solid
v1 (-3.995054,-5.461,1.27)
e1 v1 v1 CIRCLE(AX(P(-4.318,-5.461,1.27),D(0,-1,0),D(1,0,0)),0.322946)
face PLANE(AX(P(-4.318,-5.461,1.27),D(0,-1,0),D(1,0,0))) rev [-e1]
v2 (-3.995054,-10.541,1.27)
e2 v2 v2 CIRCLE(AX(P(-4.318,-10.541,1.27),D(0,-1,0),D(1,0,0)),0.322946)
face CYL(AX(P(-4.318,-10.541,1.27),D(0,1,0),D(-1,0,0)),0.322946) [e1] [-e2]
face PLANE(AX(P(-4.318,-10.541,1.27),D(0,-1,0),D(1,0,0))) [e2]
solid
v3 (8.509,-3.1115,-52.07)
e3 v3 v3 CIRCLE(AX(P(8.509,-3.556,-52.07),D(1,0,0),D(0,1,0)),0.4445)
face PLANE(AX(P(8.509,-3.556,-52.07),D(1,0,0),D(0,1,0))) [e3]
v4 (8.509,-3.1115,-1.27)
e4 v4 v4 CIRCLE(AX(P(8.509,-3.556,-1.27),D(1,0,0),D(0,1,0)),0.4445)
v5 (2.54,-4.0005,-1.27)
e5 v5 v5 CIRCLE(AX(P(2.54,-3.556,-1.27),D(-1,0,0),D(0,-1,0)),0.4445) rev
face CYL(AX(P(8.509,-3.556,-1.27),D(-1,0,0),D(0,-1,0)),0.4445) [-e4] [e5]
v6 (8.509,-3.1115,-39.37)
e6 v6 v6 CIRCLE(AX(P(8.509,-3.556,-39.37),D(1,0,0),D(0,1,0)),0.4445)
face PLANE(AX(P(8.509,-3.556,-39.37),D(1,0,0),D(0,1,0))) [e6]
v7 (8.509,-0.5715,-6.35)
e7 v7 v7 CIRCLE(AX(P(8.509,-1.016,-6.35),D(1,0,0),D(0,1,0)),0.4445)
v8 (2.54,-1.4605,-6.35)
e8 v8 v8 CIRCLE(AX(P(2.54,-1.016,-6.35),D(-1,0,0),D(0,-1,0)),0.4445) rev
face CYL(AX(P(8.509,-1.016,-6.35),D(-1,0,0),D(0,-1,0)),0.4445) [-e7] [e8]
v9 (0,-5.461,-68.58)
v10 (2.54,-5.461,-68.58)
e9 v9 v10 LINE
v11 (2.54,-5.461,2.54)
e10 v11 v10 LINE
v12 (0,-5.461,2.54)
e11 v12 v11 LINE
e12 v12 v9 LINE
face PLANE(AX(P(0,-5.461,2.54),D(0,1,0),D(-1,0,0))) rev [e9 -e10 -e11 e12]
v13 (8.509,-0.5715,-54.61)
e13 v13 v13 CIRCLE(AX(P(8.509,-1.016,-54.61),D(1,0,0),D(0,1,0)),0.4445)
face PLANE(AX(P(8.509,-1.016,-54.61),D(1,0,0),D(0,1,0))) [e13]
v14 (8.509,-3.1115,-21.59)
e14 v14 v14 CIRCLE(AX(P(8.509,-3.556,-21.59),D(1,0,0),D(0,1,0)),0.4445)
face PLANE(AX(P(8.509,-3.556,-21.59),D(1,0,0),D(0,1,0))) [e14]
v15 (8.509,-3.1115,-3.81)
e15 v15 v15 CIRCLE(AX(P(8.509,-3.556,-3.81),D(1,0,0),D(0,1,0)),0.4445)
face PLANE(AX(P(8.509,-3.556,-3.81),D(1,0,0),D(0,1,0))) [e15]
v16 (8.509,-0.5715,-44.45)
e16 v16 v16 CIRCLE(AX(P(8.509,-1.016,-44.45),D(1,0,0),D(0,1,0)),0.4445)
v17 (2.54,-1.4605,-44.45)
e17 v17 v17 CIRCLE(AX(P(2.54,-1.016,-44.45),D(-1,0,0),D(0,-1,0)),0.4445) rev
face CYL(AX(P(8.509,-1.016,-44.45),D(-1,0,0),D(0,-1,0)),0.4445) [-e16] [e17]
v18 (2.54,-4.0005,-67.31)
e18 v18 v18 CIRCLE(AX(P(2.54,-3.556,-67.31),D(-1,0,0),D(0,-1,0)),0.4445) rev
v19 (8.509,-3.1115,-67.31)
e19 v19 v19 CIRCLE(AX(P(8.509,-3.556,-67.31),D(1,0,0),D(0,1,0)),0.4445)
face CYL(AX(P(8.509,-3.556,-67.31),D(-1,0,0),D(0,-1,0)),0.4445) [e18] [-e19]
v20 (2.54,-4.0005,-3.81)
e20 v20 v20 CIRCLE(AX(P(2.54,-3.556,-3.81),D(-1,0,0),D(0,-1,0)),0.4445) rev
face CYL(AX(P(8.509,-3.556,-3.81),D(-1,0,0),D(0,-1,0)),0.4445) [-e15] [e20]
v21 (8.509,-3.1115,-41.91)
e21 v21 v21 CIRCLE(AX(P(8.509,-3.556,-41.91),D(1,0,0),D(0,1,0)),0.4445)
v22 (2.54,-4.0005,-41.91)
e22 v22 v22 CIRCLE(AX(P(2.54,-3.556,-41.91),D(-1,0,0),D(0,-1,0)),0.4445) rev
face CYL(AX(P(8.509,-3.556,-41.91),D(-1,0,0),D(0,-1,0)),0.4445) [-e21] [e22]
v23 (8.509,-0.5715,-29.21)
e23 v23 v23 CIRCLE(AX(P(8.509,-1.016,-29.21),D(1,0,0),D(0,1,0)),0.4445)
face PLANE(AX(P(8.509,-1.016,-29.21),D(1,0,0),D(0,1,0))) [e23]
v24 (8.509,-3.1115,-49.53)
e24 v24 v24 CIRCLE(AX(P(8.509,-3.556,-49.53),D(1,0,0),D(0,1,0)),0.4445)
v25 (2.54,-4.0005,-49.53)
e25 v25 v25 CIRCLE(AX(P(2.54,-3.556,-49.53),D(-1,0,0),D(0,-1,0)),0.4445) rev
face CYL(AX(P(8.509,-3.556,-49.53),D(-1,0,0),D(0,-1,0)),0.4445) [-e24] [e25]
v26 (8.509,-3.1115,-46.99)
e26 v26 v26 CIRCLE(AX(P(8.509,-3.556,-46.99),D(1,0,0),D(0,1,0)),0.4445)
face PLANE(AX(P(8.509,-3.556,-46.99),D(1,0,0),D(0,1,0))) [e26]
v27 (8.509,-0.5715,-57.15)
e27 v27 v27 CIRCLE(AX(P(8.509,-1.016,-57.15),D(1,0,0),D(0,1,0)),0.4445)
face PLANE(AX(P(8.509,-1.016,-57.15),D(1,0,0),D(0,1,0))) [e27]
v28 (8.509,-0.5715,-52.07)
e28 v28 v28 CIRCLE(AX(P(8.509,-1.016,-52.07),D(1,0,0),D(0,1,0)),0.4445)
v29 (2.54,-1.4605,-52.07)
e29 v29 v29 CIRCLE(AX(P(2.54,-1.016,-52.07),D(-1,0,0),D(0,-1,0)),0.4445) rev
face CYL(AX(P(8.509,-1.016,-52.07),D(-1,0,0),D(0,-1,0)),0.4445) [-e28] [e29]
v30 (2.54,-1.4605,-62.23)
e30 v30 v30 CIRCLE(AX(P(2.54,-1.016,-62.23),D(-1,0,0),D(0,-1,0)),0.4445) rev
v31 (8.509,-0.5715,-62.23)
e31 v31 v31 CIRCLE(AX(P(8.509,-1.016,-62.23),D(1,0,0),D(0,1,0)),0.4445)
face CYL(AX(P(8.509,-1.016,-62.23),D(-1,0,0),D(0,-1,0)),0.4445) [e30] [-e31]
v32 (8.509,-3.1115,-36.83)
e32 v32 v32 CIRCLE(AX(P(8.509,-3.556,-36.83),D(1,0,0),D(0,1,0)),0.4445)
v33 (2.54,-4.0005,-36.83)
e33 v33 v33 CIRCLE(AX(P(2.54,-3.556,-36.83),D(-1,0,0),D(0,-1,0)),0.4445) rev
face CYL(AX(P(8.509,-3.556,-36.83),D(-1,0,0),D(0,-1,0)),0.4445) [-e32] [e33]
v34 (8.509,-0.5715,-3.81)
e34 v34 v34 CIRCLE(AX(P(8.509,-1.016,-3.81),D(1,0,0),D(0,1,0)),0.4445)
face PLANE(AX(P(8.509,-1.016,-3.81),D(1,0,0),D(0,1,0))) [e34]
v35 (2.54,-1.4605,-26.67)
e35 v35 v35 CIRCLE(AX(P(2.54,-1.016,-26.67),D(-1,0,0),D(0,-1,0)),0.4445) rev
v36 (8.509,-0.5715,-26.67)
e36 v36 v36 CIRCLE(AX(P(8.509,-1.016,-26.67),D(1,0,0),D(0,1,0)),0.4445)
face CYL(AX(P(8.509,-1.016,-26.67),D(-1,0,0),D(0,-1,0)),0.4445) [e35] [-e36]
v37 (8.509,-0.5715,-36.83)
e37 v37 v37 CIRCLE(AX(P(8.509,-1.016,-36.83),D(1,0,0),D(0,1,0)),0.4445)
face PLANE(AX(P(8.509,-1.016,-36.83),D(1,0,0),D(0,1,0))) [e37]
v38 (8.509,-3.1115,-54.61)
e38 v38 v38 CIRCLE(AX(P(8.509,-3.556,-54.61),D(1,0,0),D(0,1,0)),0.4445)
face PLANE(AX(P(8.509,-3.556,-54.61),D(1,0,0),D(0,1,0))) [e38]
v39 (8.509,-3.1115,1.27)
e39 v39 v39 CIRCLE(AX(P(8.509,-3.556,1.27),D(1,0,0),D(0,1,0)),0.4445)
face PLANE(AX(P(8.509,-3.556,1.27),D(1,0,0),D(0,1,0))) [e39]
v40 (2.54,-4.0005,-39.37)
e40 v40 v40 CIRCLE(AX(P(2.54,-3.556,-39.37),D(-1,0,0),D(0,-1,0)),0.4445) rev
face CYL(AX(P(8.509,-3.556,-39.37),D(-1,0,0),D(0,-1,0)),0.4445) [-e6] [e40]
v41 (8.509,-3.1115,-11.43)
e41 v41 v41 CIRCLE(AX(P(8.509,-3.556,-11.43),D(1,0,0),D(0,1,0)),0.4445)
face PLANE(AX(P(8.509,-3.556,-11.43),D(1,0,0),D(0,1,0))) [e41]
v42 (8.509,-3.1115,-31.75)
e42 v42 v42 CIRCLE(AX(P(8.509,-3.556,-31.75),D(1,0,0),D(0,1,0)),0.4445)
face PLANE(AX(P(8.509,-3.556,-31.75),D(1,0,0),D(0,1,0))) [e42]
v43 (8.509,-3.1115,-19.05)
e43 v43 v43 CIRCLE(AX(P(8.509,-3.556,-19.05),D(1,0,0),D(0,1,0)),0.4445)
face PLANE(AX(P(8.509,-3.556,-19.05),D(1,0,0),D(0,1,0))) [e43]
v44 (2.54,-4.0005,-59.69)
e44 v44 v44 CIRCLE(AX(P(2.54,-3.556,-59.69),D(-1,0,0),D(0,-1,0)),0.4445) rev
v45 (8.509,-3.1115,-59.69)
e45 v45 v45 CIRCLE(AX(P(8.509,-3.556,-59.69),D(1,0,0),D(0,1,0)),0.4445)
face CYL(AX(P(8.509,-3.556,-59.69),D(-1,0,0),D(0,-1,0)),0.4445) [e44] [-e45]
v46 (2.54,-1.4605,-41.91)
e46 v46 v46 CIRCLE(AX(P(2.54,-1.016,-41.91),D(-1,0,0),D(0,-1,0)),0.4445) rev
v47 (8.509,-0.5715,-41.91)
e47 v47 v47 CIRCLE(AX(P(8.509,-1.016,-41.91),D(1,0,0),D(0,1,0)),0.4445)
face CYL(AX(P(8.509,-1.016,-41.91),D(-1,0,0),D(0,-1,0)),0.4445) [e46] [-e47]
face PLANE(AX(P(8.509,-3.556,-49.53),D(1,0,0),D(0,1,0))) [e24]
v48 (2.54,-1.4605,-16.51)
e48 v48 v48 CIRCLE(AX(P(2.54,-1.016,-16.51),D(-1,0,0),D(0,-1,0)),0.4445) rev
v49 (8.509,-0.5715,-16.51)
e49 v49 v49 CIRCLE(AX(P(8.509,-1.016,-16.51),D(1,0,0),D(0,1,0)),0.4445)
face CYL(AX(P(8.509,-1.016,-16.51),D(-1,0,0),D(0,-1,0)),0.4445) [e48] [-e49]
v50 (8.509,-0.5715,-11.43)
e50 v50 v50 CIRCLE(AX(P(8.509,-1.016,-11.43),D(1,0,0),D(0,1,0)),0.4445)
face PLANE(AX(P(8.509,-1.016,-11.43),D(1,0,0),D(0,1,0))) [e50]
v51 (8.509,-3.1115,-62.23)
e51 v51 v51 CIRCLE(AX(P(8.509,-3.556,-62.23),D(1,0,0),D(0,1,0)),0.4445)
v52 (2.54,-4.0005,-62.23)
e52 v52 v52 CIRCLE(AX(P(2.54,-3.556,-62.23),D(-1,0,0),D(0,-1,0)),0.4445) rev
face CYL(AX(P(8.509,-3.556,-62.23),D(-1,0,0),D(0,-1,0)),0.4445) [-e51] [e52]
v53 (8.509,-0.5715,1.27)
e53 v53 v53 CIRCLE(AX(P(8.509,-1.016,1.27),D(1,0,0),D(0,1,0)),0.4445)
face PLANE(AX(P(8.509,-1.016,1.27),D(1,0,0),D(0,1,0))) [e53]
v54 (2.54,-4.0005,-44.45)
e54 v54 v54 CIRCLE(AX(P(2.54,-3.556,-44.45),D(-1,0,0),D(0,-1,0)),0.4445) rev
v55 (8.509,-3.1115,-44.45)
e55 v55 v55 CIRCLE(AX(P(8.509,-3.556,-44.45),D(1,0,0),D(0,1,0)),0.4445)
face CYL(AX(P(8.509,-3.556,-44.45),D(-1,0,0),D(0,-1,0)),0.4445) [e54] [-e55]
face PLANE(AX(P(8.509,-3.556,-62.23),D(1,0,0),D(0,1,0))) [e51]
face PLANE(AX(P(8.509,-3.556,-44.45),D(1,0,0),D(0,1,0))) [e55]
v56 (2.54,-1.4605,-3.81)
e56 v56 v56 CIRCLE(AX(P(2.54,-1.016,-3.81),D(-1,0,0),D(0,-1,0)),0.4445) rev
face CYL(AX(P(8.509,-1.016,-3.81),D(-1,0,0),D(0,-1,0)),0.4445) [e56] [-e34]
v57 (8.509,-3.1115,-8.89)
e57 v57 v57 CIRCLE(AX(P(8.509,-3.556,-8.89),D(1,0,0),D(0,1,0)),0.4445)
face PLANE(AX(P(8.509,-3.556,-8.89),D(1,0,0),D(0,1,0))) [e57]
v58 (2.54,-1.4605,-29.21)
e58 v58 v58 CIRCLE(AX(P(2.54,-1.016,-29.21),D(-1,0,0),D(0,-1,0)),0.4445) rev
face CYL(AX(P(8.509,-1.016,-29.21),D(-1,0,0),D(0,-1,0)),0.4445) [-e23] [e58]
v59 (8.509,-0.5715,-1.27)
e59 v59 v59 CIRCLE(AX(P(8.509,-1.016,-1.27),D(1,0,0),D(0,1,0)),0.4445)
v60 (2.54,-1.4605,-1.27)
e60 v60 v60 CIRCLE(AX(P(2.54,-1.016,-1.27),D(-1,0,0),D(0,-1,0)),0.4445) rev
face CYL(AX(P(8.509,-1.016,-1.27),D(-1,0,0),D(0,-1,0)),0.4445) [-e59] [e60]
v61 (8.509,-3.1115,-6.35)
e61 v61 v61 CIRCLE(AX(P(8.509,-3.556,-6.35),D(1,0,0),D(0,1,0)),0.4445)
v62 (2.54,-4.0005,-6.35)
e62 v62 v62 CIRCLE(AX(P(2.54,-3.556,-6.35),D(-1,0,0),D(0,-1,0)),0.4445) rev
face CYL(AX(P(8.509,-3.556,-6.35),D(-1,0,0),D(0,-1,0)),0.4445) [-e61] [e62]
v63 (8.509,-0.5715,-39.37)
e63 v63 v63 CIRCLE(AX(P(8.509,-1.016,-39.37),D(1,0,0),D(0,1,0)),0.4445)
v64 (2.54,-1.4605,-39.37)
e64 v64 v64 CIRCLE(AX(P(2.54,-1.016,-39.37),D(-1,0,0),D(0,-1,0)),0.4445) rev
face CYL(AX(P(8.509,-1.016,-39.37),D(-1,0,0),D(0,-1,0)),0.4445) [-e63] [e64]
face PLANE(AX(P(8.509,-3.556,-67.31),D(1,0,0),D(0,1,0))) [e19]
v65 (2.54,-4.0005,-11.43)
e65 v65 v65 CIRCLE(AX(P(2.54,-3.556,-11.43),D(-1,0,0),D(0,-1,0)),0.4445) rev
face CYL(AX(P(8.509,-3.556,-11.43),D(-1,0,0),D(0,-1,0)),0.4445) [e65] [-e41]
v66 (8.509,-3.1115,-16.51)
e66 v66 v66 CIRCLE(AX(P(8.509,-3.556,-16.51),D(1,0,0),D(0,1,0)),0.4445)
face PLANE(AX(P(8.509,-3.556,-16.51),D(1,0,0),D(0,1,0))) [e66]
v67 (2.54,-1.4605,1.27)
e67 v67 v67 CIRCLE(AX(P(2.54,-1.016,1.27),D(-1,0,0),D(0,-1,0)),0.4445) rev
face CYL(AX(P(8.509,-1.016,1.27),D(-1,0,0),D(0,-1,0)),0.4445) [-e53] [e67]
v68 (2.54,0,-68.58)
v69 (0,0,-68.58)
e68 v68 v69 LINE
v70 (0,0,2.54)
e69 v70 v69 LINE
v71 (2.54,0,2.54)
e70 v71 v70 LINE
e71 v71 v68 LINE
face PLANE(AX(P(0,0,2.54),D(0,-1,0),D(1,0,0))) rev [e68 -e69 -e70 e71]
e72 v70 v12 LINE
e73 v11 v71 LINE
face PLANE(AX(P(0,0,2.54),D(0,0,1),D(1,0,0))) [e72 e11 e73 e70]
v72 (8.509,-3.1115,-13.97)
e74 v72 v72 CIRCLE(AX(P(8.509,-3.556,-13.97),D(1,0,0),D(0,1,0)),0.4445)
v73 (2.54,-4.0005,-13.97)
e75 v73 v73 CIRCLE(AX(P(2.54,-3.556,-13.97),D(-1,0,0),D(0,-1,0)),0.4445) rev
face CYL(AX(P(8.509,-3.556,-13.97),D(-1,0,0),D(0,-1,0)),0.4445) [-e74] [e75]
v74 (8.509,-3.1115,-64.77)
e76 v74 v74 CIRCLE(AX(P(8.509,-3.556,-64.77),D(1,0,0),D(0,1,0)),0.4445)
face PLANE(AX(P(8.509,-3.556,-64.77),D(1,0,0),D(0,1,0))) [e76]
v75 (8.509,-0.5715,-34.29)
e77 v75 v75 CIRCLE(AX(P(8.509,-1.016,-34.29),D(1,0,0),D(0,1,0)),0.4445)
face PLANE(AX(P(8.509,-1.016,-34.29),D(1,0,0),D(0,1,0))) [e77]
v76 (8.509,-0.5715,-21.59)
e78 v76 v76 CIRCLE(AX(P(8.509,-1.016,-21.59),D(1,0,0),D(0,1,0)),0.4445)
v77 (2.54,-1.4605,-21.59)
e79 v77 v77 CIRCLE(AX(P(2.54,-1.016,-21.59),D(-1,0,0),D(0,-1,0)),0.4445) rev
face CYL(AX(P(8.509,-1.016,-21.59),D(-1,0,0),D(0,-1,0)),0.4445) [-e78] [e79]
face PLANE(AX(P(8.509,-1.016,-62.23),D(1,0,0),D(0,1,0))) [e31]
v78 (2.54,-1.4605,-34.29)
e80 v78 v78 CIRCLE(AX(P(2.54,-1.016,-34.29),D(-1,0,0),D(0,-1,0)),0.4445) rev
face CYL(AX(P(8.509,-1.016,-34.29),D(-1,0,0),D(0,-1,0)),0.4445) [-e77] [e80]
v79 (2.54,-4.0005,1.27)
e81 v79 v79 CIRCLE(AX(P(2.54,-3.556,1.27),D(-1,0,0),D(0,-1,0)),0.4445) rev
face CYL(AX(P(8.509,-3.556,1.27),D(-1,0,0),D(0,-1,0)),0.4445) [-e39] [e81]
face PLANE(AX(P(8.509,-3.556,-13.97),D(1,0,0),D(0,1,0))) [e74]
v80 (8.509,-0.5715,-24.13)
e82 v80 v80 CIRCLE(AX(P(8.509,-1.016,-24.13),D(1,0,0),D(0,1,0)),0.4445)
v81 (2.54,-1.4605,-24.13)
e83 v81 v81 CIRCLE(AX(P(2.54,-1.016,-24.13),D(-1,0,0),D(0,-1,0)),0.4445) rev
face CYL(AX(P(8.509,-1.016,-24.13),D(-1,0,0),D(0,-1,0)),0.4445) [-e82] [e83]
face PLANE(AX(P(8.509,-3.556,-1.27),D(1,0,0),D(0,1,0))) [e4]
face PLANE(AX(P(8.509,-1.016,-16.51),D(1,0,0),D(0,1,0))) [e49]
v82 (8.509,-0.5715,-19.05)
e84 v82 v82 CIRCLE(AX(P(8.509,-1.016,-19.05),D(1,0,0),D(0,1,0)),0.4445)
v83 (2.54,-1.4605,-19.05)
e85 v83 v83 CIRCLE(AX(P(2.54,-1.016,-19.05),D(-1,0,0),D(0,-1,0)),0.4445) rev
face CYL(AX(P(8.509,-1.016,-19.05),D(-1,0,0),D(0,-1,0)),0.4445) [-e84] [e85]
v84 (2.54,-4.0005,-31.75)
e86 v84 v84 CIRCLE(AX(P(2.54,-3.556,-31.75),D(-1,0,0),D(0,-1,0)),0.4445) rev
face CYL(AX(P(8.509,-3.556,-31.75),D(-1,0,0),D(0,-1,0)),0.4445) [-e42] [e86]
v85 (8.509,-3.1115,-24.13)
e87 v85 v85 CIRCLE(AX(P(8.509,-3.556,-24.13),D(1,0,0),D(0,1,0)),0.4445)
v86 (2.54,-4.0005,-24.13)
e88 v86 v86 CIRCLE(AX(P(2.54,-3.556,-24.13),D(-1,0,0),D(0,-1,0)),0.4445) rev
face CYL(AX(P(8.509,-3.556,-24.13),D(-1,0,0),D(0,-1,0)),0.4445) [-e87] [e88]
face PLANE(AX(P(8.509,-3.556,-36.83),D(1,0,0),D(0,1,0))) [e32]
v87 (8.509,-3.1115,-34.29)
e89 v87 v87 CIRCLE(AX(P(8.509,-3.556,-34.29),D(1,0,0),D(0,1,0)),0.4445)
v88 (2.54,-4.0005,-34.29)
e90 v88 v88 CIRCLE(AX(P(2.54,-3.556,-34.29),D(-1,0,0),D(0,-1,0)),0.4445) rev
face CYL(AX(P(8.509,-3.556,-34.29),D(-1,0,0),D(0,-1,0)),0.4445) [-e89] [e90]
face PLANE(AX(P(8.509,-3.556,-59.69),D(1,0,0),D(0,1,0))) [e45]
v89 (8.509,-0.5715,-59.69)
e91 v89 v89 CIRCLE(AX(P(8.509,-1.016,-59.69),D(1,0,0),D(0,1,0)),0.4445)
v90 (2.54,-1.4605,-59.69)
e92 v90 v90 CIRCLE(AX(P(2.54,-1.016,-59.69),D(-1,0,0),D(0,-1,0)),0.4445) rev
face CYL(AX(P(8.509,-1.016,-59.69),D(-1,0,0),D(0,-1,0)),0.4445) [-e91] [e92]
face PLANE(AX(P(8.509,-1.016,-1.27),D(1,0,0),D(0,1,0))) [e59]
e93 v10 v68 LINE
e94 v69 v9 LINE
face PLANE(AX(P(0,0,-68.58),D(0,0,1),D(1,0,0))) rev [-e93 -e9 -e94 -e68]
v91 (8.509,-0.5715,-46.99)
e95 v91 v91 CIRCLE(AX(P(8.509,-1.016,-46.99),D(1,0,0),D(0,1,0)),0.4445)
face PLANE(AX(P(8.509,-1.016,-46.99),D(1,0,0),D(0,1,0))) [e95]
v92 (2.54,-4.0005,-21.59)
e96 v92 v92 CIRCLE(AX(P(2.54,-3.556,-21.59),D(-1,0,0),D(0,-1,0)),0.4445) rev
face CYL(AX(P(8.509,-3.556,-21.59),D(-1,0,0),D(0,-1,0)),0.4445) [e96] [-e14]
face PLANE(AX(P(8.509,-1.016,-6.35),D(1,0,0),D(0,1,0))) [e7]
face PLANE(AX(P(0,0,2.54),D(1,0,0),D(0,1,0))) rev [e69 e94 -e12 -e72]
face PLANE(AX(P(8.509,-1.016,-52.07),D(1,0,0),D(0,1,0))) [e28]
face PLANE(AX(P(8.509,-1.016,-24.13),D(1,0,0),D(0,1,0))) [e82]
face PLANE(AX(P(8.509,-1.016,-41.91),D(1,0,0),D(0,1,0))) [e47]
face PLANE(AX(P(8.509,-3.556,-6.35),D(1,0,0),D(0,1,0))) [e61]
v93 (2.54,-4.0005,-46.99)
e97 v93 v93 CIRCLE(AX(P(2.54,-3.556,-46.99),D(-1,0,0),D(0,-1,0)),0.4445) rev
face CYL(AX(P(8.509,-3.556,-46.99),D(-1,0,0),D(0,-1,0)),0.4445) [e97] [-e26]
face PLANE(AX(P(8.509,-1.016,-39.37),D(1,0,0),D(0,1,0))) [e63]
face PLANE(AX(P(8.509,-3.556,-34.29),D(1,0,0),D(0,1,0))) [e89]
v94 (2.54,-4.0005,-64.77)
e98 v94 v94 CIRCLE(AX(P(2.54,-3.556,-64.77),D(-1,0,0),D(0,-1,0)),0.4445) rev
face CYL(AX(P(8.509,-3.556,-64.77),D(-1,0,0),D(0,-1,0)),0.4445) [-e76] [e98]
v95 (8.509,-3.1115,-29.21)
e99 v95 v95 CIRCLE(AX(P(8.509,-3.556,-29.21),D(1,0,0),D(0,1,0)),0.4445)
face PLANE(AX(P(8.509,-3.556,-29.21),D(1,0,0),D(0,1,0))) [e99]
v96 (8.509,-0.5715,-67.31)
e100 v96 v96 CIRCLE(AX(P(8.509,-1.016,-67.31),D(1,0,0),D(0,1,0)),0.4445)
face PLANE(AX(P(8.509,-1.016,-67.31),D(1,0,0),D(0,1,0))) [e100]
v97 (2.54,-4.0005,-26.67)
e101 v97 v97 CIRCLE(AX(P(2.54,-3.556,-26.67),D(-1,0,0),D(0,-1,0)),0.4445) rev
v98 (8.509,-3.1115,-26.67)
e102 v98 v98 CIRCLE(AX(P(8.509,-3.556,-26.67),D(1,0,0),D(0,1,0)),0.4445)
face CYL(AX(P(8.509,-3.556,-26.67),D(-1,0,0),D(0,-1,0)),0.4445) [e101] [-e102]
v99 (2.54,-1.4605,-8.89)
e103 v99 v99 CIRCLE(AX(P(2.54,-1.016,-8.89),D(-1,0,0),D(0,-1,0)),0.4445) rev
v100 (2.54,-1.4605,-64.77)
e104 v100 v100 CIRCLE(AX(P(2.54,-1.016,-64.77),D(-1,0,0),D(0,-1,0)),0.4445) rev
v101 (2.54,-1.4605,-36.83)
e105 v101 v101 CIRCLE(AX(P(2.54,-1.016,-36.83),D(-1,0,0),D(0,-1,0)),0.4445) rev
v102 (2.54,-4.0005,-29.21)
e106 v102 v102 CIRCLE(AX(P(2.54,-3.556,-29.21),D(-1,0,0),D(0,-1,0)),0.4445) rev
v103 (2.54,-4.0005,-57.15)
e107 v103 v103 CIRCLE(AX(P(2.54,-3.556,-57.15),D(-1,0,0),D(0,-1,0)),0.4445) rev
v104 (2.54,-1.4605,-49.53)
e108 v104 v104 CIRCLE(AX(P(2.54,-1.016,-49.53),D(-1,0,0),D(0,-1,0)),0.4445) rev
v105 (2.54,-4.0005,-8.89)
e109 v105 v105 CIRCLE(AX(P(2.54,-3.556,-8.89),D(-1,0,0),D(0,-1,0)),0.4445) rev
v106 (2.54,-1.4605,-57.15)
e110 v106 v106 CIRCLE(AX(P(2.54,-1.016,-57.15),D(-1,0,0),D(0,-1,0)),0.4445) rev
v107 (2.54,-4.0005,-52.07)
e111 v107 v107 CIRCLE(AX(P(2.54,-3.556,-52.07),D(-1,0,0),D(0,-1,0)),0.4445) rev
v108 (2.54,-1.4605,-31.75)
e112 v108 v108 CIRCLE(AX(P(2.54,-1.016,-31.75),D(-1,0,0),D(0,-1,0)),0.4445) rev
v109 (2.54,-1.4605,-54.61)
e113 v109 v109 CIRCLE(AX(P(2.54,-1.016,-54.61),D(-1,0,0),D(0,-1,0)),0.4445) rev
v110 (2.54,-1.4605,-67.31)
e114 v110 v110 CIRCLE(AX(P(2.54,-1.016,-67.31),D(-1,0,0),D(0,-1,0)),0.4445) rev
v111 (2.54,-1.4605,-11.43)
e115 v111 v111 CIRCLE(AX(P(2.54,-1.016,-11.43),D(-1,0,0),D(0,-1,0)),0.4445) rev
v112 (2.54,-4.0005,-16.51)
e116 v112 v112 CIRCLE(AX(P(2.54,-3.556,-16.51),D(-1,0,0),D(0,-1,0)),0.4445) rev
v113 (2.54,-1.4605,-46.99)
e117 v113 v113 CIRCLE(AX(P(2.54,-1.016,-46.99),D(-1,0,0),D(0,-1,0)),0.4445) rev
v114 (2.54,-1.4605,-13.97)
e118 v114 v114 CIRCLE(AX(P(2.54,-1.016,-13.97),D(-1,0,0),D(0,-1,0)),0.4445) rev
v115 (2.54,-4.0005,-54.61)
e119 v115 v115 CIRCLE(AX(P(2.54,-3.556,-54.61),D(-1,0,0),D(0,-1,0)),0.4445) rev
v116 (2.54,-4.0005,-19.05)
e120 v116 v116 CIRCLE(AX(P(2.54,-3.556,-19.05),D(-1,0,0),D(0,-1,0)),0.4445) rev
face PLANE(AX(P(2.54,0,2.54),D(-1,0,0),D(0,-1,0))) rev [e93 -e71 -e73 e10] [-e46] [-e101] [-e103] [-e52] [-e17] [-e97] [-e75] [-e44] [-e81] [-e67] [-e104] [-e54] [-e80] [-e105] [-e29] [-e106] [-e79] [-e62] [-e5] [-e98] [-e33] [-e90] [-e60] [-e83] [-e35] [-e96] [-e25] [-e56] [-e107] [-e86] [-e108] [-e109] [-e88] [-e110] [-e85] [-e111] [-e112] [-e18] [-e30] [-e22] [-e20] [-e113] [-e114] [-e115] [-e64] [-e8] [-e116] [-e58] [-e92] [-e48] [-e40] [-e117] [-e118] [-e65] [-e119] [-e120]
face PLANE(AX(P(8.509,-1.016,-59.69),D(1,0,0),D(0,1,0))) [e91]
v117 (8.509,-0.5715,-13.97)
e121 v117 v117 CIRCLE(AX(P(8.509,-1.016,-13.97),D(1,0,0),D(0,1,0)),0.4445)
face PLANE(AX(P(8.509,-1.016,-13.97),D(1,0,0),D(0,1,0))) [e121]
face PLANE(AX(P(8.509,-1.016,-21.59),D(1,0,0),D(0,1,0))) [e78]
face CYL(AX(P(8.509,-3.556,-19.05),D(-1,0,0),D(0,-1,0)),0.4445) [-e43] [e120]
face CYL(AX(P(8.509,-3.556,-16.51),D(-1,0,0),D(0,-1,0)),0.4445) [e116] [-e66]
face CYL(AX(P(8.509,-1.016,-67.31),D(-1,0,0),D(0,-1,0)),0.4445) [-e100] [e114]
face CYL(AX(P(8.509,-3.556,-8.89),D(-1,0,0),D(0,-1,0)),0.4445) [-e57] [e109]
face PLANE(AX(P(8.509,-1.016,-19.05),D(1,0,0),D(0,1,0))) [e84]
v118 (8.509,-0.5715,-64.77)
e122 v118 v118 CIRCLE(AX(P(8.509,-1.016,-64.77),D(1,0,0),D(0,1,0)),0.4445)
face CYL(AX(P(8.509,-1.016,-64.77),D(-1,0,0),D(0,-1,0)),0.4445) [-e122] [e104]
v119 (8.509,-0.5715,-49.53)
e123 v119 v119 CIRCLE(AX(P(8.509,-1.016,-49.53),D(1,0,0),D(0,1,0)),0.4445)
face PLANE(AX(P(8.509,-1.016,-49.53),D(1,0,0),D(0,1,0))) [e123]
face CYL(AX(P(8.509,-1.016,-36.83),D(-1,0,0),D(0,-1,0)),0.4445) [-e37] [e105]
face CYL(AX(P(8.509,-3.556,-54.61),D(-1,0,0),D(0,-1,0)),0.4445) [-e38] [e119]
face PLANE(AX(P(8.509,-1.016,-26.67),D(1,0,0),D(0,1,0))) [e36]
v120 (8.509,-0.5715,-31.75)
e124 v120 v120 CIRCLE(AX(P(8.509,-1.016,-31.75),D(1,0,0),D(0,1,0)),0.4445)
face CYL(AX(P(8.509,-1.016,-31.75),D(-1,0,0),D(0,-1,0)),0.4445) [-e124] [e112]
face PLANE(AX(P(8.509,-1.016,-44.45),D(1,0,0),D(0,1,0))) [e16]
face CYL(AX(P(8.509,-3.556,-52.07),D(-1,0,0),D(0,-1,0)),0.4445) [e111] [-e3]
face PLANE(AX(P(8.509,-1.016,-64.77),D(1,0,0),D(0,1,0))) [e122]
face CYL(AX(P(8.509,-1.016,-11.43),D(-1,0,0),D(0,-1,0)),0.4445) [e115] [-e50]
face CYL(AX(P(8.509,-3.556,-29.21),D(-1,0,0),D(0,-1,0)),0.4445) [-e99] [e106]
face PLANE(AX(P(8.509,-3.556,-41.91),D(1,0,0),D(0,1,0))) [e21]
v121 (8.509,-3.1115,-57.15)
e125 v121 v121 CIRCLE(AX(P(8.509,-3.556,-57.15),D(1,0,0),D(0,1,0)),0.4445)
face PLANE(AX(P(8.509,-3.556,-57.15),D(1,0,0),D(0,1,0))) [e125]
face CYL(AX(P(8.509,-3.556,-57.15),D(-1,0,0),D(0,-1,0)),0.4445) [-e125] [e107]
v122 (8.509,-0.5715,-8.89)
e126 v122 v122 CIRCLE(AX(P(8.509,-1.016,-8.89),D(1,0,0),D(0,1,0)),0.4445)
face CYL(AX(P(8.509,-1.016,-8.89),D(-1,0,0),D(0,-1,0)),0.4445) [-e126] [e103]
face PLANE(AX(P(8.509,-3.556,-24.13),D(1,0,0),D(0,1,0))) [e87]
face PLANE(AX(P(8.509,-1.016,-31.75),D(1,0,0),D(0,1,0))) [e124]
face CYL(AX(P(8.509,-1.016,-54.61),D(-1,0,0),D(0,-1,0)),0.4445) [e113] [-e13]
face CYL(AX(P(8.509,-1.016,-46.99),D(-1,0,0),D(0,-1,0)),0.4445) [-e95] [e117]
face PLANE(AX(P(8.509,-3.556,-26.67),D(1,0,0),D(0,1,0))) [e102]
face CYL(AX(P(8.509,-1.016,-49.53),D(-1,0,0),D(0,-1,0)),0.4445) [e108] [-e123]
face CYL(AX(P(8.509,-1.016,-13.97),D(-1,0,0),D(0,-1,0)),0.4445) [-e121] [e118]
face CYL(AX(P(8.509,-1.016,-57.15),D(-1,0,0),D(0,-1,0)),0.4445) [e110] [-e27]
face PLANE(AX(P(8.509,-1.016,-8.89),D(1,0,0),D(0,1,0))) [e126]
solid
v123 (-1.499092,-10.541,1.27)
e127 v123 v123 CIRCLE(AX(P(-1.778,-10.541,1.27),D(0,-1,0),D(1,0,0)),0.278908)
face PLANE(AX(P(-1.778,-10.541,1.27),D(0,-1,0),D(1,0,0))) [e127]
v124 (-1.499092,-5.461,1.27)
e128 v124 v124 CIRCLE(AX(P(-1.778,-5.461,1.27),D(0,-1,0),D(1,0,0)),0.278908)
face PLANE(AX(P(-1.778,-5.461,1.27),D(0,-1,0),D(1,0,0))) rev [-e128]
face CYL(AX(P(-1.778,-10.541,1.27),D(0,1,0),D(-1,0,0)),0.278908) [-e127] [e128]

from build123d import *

# Parameters (mm, degrees)
SKETCH1_W             = 2.54
SKETCH1_H             = 5.461
EXTRUDE1_DEPTH        = 2.54
SKETCH2_R             = 0.4445
EXTRUDE2_DEPTH        = 5.969
SKETCH3_R             = 0.27890811
EXTRUDE3_DEPTH        = 5.08
SKETCH3_R_2           = 0.322946233
EXTRUDE3_2_DEPTH      = 5.08
LPATTERN1_OUTLINE_W   = 5.461
LPATTERN1_OUTLINE_H   = 68.58
LPATTERN1_DEPTH       = 2.54
LPATTERN1_START       = 2.54
LPATTERN1_2_OUTLINE_R = 0.4445
LPATTERN1_2_DEPTH     = 5.969


# Read off the part's stored shape, not the designer's step: LPattern1
with BuildPart() as part:
    # Sketch1 → Extrude1 (new body)
    with BuildSketch(Plane.XY):
        with Locations((1.27, -2.7305)):
            Rectangle(SKETCH1_W, SKETCH1_H)
    extrude(amount=EXTRUDE1_DEPTH)

    # Sketch2 → Extrude2 (add)
    with BuildSketch(Plane(origin=(2.54, 0, 0), x_dir=(0, 0, -1), z_dir=(1, 0, 0))):
        with Locations(Location((-1.27, -3.556, 0), (0, 0, 270))):
            Circle(SKETCH2_R)
        with Locations(Location((-1.27, -1.016, 0), (0, 0, 270))):
            Circle(SKETCH2_R)
    extrude(amount=EXTRUDE2_DEPTH)

    # LPattern1 outline → LPattern1 (add)
    with BuildSketch(Plane.YZ):
        with Locations((-2.7305, -34.29)):
            Rectangle(LPATTERN1_OUTLINE_W, LPATTERN1_OUTLINE_H)
    extrude(amount=LPATTERN1_DEPTH)

    # LPattern1 2 outline → LPattern1 2 (add)
    with BuildSketch(Plane.YZ.offset(LPATTERN1_START)):
        with Locations((-3.556, -1.27)):
            Circle(LPATTERN1_2_OUTLINE_R)
        with Locations((-1.016, -1.27)):
            Circle(LPATTERN1_2_OUTLINE_R)
        with Locations((-3.556, -3.81)):
            Circle(LPATTERN1_2_OUTLINE_R)
        with Locations((-1.016, -3.81)):
            Circle(LPATTERN1_2_OUTLINE_R)
        with Locations((-3.556, -6.35)):
            Circle(LPATTERN1_2_OUTLINE_R)
        with Locations((-1.016, -6.35)):
            Circle(LPATTERN1_2_OUTLINE_R)
        with Locations((-3.556, -8.89)):
            Circle(LPATTERN1_2_OUTLINE_R)
        with Locations((-1.016, -8.89)):
            Circle(LPATTERN1_2_OUTLINE_R)
        with Locations((-3.556, -11.43)):
            Circle(LPATTERN1_2_OUTLINE_R)
        with Locations((-1.016, -11.43)):
            Circle(LPATTERN1_2_OUTLINE_R)
        with Locations((-3.556, -13.97)):
            Circle(LPATTERN1_2_OUTLINE_R)
        with Locations((-1.016, -13.97)):
            Circle(LPATTERN1_2_OUTLINE_R)
        with Locations((-3.556, -16.51)):
            Circle(LPATTERN1_2_OUTLINE_R)
        with Locations((-1.016, -16.51)):
            Circle(LPATTERN1_2_OUTLINE_R)
        with Locations((-3.556, -19.05)):
            Circle(LPATTERN1_2_OUTLINE_R)
        with Locations((-1.016, -19.05)):
            Circle(LPATTERN1_2_OUTLINE_R)
        with Locations((-3.556, -21.59)):
            Circle(LPATTERN1_2_OUTLINE_R)
        with Locations((-1.016, -21.59)):
            Circle(LPATTERN1_2_OUTLINE_R)
        with Locations((-3.556, -24.13)):
            Circle(LPATTERN1_2_OUTLINE_R)
        with Locations((-1.016, -24.13)):
            Circle(LPATTERN1_2_OUTLINE_R)
        with Locations((-3.556, -26.67)):
            Circle(LPATTERN1_2_OUTLINE_R)
        with Locations((-1.016, -26.67)):
            Circle(LPATTERN1_2_OUTLINE_R)
        with Locations((-3.556, -29.21)):
            Circle(LPATTERN1_2_OUTLINE_R)
        with Locations((-1.016, -29.21)):
            Circle(LPATTERN1_2_OUTLINE_R)
        with Locations((-3.556, -31.75)):
            Circle(LPATTERN1_2_OUTLINE_R)
        with Locations((-1.016, -31.75)):
            Circle(LPATTERN1_2_OUTLINE_R)
        with Locations((-3.556, -34.29)):
            Circle(LPATTERN1_2_OUTLINE_R)
        with Locations((-1.016, -34.29)):
            Circle(LPATTERN1_2_OUTLINE_R)
        with Locations((-3.556, -36.83)):
            Circle(LPATTERN1_2_OUTLINE_R)
        with Locations((-1.016, -36.83)):
            Circle(LPATTERN1_2_OUTLINE_R)
        with Locations((-3.556, -39.37)):
            Circle(LPATTERN1_2_OUTLINE_R)
        with Locations((-1.016, -39.37)):
            Circle(LPATTERN1_2_OUTLINE_R)
        with Locations((-3.556, -41.91)):
            Circle(LPATTERN1_2_OUTLINE_R)
        with Locations((-1.016, -41.91)):
            Circle(LPATTERN1_2_OUTLINE_R)
        with Locations((-3.556, -44.45)):
            Circle(LPATTERN1_2_OUTLINE_R)
        with Locations((-1.016, -44.45)):
            Circle(LPATTERN1_2_OUTLINE_R)
        with Locations((-3.556, -46.99)):
            Circle(LPATTERN1_2_OUTLINE_R)
        with Locations((-1.016, -46.99)):
            Circle(LPATTERN1_2_OUTLINE_R)
        with Locations((-3.556, -49.53)):
            Circle(LPATTERN1_2_OUTLINE_R)
        with Locations((-1.016, -49.53)):
            Circle(LPATTERN1_2_OUTLINE_R)
        with Locations((-3.556, -52.07)):
            Circle(LPATTERN1_2_OUTLINE_R)
        with Locations((-1.016, -52.07)):
            Circle(LPATTERN1_2_OUTLINE_R)
        with Locations((-3.556, -54.61)):
            Circle(LPATTERN1_2_OUTLINE_R)
        with Locations((-1.016, -54.61)):
            Circle(LPATTERN1_2_OUTLINE_R)
        with Locations((-3.556, -57.15)):
            Circle(LPATTERN1_2_OUTLINE_R)
        with Locations((-1.016, -57.15)):
            Circle(LPATTERN1_2_OUTLINE_R)
        with Locations((-3.556, -59.69)):
            Circle(LPATTERN1_2_OUTLINE_R)
        with Locations((-1.016, -59.69)):
            Circle(LPATTERN1_2_OUTLINE_R)
        with Locations((-3.556, -62.23)):
            Circle(LPATTERN1_2_OUTLINE_R)
        with Locations((-1.016, -62.23)):
            Circle(LPATTERN1_2_OUTLINE_R)
        with Locations((-3.556, -64.77)):
            Circle(LPATTERN1_2_OUTLINE_R)
        with Locations((-1.016, -64.77)):
            Circle(LPATTERN1_2_OUTLINE_R)
        with Locations((-3.556, -67.31)):
            Circle(LPATTERN1_2_OUTLINE_R)
        with Locations((-1.016, -67.31)):
            Circle(LPATTERN1_2_OUTLINE_R)
    extrude(amount=LPATTERN1_2_DEPTH)


with BuildPart() as body_2:
    # Sketch3 → Extrude3 (new body)
    with BuildSketch(Plane.XZ.offset(5.461)):
        with Locations((-1.778, 1.27)):
            Circle(SKETCH3_R)
    extrude(amount=EXTRUDE3_DEPTH)


with BuildPart() as body_3:
    # Sketch3 → Extrude3 2 (new body)
    with BuildSketch(Plane.XZ.offset(5.461)):
        with Locations((-4.318, 1.27)):
            Circle(SKETCH3_R_2)
    extrude(amount=EXTRUDE3_2_DEPTH)


solid = Compound([part.part, body_2.part, body_3.part])
